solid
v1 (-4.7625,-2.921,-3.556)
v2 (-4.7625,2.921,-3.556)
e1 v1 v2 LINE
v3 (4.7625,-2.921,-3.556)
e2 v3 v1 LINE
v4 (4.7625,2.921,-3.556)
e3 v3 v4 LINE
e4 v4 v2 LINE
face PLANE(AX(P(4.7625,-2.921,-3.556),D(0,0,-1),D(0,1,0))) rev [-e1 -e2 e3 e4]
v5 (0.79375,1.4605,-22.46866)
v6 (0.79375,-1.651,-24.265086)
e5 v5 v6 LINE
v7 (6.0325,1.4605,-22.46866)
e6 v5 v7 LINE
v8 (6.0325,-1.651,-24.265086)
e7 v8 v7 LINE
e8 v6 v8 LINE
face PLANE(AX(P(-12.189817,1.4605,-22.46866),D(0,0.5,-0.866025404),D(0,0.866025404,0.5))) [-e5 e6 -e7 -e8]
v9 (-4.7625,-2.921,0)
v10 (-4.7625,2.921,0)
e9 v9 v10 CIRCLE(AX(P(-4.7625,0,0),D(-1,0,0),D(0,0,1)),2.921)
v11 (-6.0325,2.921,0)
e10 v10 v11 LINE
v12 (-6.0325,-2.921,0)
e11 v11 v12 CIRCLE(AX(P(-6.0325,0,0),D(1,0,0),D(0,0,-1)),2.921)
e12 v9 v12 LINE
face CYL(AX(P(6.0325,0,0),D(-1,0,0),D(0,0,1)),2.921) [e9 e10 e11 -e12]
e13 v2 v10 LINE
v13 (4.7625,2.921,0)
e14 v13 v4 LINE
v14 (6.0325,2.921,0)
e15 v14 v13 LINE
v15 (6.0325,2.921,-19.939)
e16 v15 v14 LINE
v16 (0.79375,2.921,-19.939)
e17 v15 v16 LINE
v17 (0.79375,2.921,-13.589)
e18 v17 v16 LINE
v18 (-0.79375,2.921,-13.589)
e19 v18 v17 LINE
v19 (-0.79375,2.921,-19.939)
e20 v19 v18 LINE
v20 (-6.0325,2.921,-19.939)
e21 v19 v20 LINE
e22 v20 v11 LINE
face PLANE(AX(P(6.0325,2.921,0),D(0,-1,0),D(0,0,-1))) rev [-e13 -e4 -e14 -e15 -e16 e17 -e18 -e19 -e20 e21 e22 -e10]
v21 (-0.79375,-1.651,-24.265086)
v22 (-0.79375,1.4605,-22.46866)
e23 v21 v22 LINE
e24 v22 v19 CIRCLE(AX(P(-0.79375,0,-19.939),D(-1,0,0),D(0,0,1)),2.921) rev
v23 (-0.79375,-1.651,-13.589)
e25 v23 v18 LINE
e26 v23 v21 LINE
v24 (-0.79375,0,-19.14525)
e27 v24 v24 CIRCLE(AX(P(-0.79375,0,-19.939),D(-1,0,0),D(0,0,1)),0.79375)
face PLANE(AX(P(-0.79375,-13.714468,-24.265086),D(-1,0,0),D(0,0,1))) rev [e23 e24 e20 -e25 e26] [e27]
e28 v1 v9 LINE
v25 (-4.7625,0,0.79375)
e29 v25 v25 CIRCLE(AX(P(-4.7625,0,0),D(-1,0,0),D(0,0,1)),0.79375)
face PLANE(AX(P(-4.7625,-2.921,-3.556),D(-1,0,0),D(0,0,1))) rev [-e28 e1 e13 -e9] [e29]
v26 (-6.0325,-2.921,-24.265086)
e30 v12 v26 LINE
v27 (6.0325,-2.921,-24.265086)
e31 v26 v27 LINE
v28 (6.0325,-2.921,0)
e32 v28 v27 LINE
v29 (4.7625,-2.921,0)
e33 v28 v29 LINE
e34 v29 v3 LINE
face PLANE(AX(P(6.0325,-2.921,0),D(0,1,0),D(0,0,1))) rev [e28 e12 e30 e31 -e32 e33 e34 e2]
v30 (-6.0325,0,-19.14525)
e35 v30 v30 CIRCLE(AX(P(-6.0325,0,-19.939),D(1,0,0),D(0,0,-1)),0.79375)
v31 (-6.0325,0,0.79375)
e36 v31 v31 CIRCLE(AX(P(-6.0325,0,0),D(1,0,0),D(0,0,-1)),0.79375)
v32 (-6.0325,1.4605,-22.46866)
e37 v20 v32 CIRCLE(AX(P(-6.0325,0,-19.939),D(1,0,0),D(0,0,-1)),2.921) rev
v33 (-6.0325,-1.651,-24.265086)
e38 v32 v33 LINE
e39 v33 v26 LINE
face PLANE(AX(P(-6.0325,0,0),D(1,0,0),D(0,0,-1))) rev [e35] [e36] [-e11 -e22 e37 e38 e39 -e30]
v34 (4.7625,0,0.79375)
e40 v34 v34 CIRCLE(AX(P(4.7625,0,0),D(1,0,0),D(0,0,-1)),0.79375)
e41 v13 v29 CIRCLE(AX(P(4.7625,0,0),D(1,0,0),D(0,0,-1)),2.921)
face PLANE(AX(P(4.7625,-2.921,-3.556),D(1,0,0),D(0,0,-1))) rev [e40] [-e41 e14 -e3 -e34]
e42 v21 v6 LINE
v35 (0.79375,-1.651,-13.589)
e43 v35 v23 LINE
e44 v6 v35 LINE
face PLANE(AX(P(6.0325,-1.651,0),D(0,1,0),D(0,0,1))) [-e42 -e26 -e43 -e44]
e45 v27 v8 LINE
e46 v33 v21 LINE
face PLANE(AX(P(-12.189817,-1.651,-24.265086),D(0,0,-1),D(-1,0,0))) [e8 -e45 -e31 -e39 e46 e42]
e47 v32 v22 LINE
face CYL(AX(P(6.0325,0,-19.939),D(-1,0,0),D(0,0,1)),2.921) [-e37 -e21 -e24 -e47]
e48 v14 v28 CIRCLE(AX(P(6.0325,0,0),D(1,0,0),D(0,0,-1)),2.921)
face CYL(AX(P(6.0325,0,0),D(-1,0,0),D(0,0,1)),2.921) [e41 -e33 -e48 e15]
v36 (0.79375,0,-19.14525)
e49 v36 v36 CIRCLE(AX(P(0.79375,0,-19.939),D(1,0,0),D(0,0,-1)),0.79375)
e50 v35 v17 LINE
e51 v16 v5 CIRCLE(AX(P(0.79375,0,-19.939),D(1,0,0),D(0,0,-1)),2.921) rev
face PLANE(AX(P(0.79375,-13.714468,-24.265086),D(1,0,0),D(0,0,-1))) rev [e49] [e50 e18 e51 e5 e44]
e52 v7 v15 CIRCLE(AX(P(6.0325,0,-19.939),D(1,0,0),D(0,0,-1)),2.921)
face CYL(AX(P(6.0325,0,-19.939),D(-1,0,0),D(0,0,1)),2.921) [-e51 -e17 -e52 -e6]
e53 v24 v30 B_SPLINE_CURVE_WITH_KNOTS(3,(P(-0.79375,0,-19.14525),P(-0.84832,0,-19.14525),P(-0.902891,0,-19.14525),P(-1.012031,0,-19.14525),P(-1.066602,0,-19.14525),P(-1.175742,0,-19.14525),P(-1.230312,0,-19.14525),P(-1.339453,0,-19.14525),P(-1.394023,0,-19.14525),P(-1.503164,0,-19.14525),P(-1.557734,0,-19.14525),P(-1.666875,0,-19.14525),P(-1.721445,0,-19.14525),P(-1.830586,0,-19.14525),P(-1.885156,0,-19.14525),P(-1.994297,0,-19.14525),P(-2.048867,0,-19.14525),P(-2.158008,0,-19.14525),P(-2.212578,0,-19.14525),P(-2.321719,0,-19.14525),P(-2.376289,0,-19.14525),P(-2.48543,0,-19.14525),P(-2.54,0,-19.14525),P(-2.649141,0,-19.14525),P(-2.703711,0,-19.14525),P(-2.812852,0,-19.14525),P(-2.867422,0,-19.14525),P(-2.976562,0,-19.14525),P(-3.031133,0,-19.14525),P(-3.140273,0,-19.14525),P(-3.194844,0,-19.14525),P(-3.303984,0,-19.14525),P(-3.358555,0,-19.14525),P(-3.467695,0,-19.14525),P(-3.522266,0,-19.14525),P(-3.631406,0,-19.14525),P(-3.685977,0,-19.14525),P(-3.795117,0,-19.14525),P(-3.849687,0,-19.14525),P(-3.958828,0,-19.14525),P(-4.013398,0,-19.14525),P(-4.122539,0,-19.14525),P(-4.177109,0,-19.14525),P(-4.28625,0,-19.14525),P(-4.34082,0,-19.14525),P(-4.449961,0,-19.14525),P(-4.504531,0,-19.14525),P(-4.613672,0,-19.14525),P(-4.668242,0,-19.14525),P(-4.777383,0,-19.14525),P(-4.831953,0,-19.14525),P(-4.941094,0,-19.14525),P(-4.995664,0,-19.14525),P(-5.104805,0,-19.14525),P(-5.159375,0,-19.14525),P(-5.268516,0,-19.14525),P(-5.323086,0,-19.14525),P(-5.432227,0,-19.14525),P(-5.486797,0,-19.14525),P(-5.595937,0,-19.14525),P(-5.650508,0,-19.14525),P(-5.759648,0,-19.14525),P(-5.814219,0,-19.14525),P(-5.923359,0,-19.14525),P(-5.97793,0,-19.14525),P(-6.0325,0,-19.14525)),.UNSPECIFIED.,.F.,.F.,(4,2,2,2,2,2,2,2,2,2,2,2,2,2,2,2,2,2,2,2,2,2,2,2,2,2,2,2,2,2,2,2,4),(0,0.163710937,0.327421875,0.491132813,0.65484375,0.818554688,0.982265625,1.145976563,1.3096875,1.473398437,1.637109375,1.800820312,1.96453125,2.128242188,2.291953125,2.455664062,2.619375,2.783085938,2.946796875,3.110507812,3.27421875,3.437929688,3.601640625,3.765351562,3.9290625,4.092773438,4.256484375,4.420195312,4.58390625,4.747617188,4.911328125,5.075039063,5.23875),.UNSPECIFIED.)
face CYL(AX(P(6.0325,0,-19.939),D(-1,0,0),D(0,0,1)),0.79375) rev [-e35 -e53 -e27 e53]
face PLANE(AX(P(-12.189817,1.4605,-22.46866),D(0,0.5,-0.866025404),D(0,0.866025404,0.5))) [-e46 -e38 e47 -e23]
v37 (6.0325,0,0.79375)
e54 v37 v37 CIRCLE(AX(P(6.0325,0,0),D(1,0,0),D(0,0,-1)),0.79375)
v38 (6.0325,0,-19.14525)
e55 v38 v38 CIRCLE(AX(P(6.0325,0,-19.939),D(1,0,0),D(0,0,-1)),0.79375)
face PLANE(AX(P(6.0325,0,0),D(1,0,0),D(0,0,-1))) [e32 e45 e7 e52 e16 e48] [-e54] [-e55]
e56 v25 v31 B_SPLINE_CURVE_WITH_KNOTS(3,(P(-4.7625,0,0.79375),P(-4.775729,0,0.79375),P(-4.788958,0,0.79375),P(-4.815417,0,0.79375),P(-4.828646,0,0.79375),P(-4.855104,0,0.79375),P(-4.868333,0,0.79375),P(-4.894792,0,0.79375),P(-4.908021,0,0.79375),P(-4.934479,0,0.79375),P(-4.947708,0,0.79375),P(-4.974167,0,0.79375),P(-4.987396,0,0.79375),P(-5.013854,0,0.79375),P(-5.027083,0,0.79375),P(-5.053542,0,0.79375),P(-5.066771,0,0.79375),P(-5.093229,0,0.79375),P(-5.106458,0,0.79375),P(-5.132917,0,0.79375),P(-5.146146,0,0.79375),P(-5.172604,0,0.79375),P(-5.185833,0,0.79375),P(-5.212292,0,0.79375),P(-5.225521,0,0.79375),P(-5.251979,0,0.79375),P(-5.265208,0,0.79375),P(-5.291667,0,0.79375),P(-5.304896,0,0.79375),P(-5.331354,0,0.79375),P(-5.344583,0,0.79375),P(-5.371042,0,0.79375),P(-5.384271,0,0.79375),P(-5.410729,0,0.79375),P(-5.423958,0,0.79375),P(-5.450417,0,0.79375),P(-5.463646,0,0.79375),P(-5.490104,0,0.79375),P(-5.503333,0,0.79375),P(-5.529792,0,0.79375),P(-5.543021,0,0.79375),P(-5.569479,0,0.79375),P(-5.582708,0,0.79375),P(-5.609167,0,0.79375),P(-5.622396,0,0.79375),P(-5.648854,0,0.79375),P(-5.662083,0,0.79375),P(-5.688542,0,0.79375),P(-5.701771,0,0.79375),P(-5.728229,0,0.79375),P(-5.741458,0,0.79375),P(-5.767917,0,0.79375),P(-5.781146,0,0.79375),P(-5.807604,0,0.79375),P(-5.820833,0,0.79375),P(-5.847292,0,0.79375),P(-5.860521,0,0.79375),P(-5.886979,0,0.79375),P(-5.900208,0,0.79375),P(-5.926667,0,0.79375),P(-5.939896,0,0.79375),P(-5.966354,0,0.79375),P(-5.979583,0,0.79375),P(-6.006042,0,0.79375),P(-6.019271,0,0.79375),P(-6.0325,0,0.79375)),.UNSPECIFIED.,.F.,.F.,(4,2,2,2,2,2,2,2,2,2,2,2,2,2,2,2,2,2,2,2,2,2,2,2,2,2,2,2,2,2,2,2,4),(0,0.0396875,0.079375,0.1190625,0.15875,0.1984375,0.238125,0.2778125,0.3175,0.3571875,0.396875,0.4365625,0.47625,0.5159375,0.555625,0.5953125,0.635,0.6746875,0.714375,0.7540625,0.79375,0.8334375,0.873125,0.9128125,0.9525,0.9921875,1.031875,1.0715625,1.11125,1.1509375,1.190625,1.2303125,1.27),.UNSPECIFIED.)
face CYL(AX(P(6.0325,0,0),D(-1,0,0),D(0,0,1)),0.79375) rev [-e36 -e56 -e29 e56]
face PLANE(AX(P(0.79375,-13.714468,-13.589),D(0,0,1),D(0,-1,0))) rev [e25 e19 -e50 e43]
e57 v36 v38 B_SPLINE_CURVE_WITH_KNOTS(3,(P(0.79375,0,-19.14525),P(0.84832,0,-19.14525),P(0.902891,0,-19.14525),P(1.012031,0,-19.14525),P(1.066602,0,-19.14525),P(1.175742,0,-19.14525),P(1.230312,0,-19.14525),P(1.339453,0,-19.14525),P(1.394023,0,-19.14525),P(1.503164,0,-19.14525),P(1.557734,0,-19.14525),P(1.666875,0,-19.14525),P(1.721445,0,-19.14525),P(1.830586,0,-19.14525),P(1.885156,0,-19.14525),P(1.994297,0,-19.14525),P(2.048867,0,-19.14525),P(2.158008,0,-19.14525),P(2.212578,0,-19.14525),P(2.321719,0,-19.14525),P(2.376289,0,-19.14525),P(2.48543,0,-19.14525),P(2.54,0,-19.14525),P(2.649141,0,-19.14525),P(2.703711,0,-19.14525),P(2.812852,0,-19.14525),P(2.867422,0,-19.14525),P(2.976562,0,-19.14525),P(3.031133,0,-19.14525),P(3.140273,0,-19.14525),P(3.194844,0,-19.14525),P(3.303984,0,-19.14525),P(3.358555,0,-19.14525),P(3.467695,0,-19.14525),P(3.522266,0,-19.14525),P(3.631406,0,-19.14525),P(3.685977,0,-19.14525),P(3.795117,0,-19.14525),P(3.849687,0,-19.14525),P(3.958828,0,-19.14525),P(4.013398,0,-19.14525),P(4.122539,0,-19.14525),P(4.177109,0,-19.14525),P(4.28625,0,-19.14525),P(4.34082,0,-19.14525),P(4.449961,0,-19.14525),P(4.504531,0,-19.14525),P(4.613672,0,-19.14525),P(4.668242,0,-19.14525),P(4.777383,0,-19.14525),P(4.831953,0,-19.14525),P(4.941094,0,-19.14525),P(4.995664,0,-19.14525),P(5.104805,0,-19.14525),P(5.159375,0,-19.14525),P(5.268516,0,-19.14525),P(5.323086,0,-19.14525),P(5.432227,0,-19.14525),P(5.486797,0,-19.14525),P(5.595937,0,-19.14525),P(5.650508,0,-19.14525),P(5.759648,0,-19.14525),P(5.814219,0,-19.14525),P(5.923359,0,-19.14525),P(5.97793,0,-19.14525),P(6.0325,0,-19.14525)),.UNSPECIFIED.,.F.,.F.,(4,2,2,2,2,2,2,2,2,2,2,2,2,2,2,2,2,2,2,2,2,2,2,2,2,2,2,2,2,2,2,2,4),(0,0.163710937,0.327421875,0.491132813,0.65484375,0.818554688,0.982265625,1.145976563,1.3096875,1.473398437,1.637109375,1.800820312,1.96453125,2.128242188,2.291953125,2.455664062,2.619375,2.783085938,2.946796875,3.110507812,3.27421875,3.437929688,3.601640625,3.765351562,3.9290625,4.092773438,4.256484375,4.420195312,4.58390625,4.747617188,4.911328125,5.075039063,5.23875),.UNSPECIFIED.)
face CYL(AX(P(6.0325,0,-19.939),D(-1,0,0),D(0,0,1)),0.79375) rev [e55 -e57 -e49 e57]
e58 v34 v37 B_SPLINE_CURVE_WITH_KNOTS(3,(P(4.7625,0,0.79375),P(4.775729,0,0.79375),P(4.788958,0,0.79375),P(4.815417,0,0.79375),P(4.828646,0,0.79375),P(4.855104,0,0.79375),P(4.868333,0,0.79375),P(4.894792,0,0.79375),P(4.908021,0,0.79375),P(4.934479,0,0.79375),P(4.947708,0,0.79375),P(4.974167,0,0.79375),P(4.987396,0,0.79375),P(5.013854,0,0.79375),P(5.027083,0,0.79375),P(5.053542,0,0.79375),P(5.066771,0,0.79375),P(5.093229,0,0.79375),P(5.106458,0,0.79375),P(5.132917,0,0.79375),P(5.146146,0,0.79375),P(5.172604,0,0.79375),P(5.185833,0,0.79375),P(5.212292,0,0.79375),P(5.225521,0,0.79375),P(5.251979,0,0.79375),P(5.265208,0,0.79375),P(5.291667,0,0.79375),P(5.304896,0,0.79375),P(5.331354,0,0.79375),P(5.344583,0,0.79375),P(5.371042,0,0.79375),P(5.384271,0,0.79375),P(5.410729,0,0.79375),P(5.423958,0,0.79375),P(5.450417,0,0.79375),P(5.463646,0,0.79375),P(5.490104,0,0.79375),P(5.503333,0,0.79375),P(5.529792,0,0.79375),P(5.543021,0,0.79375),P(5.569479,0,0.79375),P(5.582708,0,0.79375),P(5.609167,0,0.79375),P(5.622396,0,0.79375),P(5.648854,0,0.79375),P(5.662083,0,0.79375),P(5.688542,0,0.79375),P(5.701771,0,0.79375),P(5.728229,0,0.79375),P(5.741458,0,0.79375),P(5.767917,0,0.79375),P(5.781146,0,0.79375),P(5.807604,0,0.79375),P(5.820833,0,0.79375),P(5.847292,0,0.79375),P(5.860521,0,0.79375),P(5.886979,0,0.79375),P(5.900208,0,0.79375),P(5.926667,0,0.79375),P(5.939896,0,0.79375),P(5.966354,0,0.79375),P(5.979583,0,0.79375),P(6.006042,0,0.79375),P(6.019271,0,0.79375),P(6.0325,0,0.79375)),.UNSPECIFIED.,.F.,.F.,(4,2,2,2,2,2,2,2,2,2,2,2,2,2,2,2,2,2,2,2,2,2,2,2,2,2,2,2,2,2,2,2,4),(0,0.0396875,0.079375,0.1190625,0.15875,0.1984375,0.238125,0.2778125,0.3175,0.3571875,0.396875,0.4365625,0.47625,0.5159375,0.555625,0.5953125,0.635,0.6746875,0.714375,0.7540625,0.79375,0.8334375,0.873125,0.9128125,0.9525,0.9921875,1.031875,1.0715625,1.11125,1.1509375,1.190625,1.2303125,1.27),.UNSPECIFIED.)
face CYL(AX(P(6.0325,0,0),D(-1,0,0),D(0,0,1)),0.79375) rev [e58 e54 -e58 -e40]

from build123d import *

# Parameters (mm, degrees)
SKETCH1_R          = 0.79375
EXTRUDE1_DEPTH     = 6.0325
SKETCH2_W          = 9.525
SKETCH2_H          = 6.477
CUT_EXTRUDE1_DEPTH = 25.353636695
FILLET1_R          = 2.921
EXTRUDE2_DEPTH     = 12.065
SKETCH5_W          = 1.5875
SKETCH5_H          = 10.676085567
CUT_EXTRUDE2_DEPTH = 4.572


with BuildPart() as part:
    # Sketch1 → Extrude1 (new, symmetric)
    with BuildSketch(Plane(origin=(0, 0, 0), x_dir=(0, 0, -1), z_dir=(1, 0, 0))):
        with BuildLine():
            Line((0, 2.921), (22.86, 2.921))
            Line((22.86, 2.921), (22.86, -2.921))
            Line((22.86, -2.921), (0, -2.921))
            ThreePointArc((0, -2.921), (-2.921, 0), (0, 2.921))
        make_face()
        with Locations(Location((0, 0, 0), (0, 0, 180))):
            Circle(SKETCH1_R, mode=Mode.SUBTRACT)
        with Locations(Location((19.939, 0, 0), (0, 0, 180))):
            Circle(SKETCH1_R, mode=Mode.SUBTRACT)
    extrude(amount=EXTRUDE1_DEPTH, both=True)

    # Sketch2 → Cut-Extrude1 (cut, through all)
    with BuildSketch(Plane(origin=(0, 2.921, 0), x_dir=(-1, 0, 0), z_dir=(0, 1, 0))):
        with Locations((0, -0.3175)):
            Rectangle(SKETCH2_W, SKETCH2_H)
    extrude(amount=-CUT_EXTRUDE1_DEPTH, mode=Mode.SUBTRACT)

    # Fillet1
    fillet1_edges = [part.edges().sort_by_distance(p)[0] for p in [
        (0, 2.921, -22.86),
        (0, -2.921, -22.86),
    ]]
    fillet(fillet1_edges, radius=FILLET1_R - 0.0001)  # a hair under: the kernel refuses the full size

    # Sketch3 → Extrude2 (add)
    with BuildSketch(Plane(origin=(6.0325, 0, 0), x_dir=(0, 0, -1), z_dir=(1, 0, 0))):
        with BuildLine():
            Line((22.468660204, 1.4605), (24.265085567, -1.651))
            Line((24.265085567, -1.651), (24.265085567, -2.921))
            Line((24.265085567, -2.921), (19.939, -2.921))
            ThreePointArc((19.939, -2.921), (22.004458908, -2.065458908), (22.86, 0))
            ThreePointArc((22.86, 0), (22.760469339, 0.756010431), (22.468660204, 1.4605))
        make_face()
    extrude(amount=-EXTRUDE2_DEPTH)

    # Sketch5 → Cut-Extrude2 (cut)
    with BuildSketch(Plane(origin=(0, 2.921, 0), x_dir=(-1, 0, 0), z_dir=(0, 1, 0))):
        with Locations((0, -18.927042783)):
            Rectangle(SKETCH5_W, SKETCH5_H)
    extrude(amount=-CUT_EXTRUDE2_DEPTH, mode=Mode.SUBTRACT)


solid = part.part
